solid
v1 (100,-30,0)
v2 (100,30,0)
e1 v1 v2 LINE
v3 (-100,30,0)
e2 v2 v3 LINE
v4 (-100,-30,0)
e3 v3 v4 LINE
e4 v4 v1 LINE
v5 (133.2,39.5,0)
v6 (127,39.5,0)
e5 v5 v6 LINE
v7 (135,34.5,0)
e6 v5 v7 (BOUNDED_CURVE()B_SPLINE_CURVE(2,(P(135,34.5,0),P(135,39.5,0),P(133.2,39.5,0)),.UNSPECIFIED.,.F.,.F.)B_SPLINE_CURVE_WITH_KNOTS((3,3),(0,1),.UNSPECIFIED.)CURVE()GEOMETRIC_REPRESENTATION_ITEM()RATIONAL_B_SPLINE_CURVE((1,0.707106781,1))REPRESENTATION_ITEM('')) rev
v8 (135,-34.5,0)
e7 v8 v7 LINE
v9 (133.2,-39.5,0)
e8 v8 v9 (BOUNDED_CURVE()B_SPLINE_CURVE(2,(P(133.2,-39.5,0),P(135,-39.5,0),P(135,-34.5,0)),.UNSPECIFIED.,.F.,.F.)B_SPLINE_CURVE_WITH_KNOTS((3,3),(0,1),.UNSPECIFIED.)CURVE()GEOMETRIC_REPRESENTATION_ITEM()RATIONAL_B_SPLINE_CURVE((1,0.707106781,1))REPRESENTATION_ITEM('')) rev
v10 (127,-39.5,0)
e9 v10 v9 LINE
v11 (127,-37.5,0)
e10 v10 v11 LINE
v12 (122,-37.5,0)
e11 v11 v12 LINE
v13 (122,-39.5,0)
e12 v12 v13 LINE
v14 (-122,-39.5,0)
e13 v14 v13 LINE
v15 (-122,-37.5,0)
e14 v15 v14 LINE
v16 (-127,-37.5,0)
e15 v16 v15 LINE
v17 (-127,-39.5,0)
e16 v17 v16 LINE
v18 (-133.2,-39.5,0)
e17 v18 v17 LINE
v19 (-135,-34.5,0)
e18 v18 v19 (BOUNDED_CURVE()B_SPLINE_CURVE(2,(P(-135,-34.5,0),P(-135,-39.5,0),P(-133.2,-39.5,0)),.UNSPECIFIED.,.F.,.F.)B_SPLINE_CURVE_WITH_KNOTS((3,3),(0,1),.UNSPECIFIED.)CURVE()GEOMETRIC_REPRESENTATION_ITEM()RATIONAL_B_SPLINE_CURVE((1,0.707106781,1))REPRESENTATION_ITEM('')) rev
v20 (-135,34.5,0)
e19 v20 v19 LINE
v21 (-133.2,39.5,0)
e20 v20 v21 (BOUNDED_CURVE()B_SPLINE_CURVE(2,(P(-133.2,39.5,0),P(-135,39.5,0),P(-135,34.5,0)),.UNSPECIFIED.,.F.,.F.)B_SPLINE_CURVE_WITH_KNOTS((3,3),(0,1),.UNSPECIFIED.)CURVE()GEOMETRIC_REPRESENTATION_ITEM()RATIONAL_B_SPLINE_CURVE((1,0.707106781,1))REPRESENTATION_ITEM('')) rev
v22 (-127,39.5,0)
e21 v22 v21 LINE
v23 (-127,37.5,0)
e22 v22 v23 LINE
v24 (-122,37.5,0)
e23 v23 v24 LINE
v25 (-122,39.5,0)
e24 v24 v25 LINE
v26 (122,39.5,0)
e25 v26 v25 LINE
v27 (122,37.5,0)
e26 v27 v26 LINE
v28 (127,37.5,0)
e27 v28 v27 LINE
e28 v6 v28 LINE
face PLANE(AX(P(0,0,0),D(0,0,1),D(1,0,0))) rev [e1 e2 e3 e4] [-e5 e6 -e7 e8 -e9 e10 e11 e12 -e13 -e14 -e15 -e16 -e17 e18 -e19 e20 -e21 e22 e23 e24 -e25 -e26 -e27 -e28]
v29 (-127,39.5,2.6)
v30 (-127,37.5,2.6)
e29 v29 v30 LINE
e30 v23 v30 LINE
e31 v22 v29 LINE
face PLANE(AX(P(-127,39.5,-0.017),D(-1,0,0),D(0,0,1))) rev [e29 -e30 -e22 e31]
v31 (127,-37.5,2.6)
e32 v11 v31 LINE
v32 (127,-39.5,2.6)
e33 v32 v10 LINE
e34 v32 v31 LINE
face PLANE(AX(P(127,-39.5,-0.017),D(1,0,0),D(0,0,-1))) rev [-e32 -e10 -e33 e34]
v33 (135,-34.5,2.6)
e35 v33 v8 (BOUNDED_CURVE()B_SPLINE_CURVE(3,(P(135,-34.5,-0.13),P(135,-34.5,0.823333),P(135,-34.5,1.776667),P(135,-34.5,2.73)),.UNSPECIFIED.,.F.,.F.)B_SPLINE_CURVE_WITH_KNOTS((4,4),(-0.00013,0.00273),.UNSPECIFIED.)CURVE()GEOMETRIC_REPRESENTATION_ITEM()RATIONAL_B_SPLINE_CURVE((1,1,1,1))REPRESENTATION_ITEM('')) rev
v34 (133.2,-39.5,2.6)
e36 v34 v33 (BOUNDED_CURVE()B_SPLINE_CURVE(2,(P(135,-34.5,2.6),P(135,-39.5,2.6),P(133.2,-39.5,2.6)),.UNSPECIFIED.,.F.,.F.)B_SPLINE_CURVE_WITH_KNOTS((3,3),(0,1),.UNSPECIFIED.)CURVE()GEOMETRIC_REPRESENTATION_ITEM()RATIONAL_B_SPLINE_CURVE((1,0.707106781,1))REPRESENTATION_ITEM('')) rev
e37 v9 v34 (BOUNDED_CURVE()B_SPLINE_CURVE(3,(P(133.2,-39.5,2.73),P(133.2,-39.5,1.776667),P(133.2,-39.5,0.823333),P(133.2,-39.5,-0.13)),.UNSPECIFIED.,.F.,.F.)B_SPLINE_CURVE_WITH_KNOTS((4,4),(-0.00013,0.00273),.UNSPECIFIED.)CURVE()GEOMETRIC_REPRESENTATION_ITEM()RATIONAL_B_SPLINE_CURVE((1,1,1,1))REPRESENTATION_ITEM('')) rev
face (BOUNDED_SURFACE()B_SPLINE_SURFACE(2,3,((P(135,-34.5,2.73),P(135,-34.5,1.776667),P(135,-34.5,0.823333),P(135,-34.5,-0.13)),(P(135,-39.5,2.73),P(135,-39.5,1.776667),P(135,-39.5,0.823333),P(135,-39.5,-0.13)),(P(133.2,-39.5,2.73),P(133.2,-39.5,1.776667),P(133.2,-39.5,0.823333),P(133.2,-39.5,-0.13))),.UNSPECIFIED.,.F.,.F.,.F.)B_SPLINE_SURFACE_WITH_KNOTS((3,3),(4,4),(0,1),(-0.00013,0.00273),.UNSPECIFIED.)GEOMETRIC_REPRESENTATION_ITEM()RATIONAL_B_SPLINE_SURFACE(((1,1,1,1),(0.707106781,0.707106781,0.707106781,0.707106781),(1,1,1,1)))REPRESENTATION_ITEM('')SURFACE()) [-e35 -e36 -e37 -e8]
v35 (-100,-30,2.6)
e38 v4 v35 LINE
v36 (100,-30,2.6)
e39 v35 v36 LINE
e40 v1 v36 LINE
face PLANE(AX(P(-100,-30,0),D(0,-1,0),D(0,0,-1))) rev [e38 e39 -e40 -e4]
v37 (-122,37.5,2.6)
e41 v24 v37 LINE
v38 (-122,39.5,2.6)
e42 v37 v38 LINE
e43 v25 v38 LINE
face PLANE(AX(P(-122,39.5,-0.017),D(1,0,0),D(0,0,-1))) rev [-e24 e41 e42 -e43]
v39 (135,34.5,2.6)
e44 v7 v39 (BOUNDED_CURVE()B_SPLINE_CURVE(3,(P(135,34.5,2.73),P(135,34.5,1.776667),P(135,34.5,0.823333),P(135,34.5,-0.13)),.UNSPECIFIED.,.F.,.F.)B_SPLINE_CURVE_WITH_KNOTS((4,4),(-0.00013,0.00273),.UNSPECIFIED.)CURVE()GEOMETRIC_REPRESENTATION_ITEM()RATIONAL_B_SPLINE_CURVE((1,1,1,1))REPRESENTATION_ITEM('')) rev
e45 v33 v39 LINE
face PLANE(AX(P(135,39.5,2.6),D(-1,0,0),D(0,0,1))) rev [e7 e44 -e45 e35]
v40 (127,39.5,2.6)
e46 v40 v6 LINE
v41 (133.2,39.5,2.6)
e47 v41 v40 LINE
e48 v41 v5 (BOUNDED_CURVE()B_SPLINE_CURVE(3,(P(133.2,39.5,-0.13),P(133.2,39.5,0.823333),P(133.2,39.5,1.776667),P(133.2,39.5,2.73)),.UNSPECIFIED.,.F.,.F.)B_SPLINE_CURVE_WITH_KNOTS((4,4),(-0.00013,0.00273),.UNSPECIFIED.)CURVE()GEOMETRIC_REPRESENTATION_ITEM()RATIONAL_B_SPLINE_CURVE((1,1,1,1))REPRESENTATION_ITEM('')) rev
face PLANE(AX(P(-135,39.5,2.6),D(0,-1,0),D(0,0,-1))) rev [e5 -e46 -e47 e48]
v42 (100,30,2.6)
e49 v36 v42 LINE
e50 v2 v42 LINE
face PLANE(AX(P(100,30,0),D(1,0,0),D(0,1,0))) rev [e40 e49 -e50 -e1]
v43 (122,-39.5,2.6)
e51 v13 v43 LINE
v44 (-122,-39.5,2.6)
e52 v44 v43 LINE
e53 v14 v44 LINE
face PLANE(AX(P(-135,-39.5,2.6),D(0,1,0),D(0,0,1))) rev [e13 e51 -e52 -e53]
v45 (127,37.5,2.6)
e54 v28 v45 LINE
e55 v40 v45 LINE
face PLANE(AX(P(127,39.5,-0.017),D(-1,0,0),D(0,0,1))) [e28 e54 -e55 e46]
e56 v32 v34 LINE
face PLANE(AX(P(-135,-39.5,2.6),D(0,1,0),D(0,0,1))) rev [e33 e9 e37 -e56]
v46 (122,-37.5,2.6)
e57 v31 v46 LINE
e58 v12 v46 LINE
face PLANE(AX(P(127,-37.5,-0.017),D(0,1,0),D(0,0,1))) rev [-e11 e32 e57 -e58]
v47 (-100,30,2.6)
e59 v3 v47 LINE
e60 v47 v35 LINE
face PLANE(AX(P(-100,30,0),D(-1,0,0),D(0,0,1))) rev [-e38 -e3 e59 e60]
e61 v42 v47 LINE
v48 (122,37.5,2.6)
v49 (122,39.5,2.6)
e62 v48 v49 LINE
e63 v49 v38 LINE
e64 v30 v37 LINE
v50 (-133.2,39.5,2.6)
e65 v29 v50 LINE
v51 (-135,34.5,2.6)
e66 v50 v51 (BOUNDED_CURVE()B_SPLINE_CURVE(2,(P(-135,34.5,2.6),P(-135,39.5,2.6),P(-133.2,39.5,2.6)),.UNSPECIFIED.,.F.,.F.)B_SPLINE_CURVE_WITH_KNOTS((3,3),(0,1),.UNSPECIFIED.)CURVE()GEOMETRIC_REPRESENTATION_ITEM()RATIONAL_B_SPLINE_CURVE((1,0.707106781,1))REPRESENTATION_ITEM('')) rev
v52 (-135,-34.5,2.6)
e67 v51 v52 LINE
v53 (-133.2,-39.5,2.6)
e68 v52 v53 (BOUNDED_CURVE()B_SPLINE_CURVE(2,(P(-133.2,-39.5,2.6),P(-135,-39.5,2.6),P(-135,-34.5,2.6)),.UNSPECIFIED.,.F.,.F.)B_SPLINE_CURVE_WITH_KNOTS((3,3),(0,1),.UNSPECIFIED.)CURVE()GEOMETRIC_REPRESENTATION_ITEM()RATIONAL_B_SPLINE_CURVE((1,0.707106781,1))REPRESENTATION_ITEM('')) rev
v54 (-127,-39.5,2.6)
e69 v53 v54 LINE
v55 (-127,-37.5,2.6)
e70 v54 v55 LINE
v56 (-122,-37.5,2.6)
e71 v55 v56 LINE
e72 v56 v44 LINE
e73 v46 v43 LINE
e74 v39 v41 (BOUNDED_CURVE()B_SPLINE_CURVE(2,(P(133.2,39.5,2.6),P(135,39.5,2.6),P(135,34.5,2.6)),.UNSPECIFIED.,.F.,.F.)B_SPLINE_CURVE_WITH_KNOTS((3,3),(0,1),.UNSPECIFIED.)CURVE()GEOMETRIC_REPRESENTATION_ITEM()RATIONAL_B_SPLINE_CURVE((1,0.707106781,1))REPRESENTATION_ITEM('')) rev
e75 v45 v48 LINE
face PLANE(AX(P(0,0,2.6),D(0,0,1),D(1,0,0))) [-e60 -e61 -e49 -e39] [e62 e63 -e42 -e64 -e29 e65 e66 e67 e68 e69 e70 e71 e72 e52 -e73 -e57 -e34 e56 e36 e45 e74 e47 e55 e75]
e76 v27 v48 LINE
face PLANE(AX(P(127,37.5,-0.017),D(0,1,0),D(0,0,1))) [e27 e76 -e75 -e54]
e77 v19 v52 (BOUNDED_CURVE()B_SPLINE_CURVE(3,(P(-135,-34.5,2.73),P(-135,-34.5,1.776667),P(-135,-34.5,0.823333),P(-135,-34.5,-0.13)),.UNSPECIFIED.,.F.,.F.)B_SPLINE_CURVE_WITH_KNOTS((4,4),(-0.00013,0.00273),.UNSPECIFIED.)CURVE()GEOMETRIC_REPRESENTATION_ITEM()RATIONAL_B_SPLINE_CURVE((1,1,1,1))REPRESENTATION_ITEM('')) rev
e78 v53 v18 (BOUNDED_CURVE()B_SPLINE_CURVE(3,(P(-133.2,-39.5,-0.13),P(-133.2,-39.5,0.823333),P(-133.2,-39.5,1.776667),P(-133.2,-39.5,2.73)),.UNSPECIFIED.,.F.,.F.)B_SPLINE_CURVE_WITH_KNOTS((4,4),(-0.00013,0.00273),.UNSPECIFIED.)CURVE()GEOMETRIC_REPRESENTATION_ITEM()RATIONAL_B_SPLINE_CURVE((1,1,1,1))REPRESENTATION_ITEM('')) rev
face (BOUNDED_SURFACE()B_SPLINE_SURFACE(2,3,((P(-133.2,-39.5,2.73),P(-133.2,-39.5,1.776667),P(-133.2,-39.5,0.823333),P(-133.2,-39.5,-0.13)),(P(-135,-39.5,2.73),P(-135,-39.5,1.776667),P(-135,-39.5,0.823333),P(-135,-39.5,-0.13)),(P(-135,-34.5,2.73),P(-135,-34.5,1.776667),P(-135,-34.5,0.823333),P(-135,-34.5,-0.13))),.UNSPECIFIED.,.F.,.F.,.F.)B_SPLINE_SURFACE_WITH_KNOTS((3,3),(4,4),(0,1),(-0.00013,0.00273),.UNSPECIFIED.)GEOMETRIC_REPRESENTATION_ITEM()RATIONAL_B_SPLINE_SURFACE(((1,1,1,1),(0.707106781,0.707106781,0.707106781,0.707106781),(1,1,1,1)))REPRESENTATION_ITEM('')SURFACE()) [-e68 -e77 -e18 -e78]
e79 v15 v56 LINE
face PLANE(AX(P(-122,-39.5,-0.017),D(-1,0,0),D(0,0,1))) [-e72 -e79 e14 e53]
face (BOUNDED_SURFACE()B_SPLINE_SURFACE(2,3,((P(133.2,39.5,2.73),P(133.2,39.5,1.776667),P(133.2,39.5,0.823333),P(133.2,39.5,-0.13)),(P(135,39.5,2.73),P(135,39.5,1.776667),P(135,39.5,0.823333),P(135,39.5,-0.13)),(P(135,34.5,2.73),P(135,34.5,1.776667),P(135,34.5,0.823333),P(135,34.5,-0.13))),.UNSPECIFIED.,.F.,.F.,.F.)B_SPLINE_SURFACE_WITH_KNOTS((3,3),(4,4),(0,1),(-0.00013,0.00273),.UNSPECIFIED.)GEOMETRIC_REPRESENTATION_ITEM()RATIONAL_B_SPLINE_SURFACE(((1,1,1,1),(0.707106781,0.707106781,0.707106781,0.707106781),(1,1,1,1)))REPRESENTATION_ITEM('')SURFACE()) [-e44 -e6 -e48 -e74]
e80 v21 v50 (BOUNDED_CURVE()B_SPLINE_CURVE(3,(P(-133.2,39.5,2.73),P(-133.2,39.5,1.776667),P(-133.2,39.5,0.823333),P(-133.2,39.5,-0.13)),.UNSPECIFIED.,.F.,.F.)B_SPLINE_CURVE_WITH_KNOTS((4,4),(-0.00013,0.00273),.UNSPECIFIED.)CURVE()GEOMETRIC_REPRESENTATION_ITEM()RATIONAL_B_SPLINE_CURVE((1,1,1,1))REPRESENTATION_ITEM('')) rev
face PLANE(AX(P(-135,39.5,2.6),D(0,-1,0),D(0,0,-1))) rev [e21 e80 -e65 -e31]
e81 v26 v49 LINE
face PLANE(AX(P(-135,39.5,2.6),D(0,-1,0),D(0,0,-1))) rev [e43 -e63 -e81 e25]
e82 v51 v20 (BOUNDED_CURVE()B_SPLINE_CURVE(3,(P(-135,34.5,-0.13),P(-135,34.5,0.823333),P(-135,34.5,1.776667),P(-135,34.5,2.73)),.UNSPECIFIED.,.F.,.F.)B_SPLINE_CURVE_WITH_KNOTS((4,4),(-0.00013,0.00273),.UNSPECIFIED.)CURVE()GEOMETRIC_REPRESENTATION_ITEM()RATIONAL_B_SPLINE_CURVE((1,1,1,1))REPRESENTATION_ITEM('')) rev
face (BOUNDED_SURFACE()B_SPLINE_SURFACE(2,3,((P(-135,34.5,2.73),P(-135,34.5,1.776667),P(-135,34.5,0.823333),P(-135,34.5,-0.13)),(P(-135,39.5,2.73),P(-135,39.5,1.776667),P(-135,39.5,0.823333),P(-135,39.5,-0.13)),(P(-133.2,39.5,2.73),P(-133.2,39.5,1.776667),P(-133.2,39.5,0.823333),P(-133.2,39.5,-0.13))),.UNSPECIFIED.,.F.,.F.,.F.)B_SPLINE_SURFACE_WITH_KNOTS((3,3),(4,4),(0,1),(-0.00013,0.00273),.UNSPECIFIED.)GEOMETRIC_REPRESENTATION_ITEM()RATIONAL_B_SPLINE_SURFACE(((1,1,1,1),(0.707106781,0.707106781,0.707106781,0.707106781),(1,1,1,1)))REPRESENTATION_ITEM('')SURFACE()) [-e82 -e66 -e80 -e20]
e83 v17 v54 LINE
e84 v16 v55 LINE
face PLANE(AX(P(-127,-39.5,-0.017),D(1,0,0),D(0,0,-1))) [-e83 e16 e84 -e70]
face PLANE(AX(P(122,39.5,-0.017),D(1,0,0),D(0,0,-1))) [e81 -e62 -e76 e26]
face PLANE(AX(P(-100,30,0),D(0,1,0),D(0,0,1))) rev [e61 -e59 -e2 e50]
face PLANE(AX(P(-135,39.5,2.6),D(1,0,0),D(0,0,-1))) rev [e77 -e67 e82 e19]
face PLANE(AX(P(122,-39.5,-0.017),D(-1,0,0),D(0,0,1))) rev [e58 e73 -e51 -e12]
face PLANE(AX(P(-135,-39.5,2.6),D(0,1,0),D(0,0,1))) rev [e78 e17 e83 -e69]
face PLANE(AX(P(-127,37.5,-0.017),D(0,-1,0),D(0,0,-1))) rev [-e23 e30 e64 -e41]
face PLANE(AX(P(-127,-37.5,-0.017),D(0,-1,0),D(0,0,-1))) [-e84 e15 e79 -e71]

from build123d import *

# Parameters (mm, degrees)
SKETCH_1_W               = 270
SKETCH_1_H               = 79
EXTRUDE_1_DEPTH          = 2.6
SKETCH_2_W               = 200
SKETCH_2_H               = 60
CUT_EXTRUDE_1_DEPTH      = 141.684078701
FILLET_1_SIZE            = 5
FILLET_1_SIZE_2          = 1.8
SKETCH_3_W               = 5
SKETCH_3_H               = 2
CUT_EXTRUDE_2_DEPTH      = 141.684078827
MIRROR_2_COPY_1_SKETCH_W = 5
MIRROR_2_COPY_1_SKETCH_H = 2
MIRROR_2_COPY_1_DEPTH    = 141.684078827


with BuildPart() as part:
    # 草图1 → 凸台-拉伸1 (new body)
    with BuildSketch(Plane.XY):
        Rectangle(SKETCH_1_W, SKETCH_1_H)
    extrude(amount=EXTRUDE_1_DEPTH)

    # 草图2 → 切除-拉伸1 (cut, through all)
    with BuildSketch(Plane.XY.offset(2.6)):
        Rectangle(SKETCH_2_W, SKETCH_2_H)
    extrude(amount=-CUT_EXTRUDE_1_DEPTH, mode=Mode.SUBTRACT)

    # 圆角1
    # an asymmetric fillet: 5, 1.8 mm, written as the material it takes off along each edge
    with BuildSketch(Plane(origin=(135, -39.5, -12.5), x_dir=(0, 1, 0), z_dir=(0, 0, 1))) as fillet_1_piece_1:
        with BuildLine():
            Bezier((FILLET_1_SIZE, 0), (0, 0), (0, FILLET_1_SIZE_2), weights=[1, 0.707106781, 1])
            Line((0, FILLET_1_SIZE_2), (0, 0))
            Line((0, 0), (FILLET_1_SIZE, 0))
        make_face()
    extrude(amount=27.6, mode=Mode.SUBTRACT)
    with BuildSketch(Plane(origin=(135, 39.5, -12.5), x_dir=(-1, 0, 0), z_dir=(0, 0, 1))) as fillet_1_piece_2:
        with BuildLine():
            Bezier((FILLET_1_SIZE_2, 0), (0, 0), (0, FILLET_1_SIZE), weights=[1, 0.707106781, 1])
            Line((0, FILLET_1_SIZE), (0, 0))
            Line((0, 0), (FILLET_1_SIZE_2, 0))
        make_face()
    extrude(amount=27.6, mode=Mode.SUBTRACT)
    with BuildSketch(Plane(origin=(-135, -39.5, -12.5), x_dir=(0, 1, 0), z_dir=(0, 0, 1))) as fillet_1_piece_3:
        with BuildLine():
            Bezier((FILLET_1_SIZE, 0), (0, 0), (0, -FILLET_1_SIZE_2), weights=[1, 0.707106781, 1])
            Line((0, -FILLET_1_SIZE_2), (0, 0))
            Line((0, 0), (FILLET_1_SIZE, 0))
        make_face()
    extrude(amount=27.6, mode=Mode.SUBTRACT)
    with BuildSketch(Plane(origin=(-135, 39.5, -12.5), x_dir=(1, 0, 0), z_dir=(0, 0, 1))) as fillet_1_piece_4:
        with BuildLine():
            Bezier((FILLET_1_SIZE_2, 0), (0, 0), (0, -FILLET_1_SIZE), weights=[1, 0.707106781, 1])
            Line((0, -FILLET_1_SIZE), (0, 0))
            Line((0, 0), (FILLET_1_SIZE_2, 0))
        make_face()
    extrude(amount=27.6, mode=Mode.SUBTRACT)

    # 草图3 → 切除-拉伸2 (cut, through all)
    with BuildSketch(Plane.XY.offset(2.6)):
        with Locations((-124.5, 38.5)):
            Rectangle(SKETCH_3_W, SKETCH_3_H)
    cut_extrude_2 = extrude(amount=-CUT_EXTRUDE_2_DEPTH, mode=Mode.SUBTRACT)

    # 镜向1: 切除-拉伸2 across plane
    add(cut_extrude_2.mirror(Plane.ZX), mode=Mode.SUBTRACT)

    # 镜向2: 切除-拉伸2 across plane
    add(cut_extrude_2.mirror(Plane(origin=(0, 0, 0), x_dir=(0, 0, 1), z_dir=(1, 0, 0))), mode=Mode.SUBTRACT)

    # 镜向2 copy 1 sketch → 镜向2 copy 1 (cut, through all)
    with BuildSketch(Plane(origin=(0, 0, 2.6), x_dir=(-1, 0, 0), z_dir=(0, 0, 1))):
        with Locations((-124.5, 38.5)):
            Rectangle(MIRROR_2_COPY_1_SKETCH_W, MIRROR_2_COPY_1_SKETCH_H)
    extrude(amount=-MIRROR_2_COPY_1_DEPTH, mode=Mode.SUBTRACT)


solid = part.part
